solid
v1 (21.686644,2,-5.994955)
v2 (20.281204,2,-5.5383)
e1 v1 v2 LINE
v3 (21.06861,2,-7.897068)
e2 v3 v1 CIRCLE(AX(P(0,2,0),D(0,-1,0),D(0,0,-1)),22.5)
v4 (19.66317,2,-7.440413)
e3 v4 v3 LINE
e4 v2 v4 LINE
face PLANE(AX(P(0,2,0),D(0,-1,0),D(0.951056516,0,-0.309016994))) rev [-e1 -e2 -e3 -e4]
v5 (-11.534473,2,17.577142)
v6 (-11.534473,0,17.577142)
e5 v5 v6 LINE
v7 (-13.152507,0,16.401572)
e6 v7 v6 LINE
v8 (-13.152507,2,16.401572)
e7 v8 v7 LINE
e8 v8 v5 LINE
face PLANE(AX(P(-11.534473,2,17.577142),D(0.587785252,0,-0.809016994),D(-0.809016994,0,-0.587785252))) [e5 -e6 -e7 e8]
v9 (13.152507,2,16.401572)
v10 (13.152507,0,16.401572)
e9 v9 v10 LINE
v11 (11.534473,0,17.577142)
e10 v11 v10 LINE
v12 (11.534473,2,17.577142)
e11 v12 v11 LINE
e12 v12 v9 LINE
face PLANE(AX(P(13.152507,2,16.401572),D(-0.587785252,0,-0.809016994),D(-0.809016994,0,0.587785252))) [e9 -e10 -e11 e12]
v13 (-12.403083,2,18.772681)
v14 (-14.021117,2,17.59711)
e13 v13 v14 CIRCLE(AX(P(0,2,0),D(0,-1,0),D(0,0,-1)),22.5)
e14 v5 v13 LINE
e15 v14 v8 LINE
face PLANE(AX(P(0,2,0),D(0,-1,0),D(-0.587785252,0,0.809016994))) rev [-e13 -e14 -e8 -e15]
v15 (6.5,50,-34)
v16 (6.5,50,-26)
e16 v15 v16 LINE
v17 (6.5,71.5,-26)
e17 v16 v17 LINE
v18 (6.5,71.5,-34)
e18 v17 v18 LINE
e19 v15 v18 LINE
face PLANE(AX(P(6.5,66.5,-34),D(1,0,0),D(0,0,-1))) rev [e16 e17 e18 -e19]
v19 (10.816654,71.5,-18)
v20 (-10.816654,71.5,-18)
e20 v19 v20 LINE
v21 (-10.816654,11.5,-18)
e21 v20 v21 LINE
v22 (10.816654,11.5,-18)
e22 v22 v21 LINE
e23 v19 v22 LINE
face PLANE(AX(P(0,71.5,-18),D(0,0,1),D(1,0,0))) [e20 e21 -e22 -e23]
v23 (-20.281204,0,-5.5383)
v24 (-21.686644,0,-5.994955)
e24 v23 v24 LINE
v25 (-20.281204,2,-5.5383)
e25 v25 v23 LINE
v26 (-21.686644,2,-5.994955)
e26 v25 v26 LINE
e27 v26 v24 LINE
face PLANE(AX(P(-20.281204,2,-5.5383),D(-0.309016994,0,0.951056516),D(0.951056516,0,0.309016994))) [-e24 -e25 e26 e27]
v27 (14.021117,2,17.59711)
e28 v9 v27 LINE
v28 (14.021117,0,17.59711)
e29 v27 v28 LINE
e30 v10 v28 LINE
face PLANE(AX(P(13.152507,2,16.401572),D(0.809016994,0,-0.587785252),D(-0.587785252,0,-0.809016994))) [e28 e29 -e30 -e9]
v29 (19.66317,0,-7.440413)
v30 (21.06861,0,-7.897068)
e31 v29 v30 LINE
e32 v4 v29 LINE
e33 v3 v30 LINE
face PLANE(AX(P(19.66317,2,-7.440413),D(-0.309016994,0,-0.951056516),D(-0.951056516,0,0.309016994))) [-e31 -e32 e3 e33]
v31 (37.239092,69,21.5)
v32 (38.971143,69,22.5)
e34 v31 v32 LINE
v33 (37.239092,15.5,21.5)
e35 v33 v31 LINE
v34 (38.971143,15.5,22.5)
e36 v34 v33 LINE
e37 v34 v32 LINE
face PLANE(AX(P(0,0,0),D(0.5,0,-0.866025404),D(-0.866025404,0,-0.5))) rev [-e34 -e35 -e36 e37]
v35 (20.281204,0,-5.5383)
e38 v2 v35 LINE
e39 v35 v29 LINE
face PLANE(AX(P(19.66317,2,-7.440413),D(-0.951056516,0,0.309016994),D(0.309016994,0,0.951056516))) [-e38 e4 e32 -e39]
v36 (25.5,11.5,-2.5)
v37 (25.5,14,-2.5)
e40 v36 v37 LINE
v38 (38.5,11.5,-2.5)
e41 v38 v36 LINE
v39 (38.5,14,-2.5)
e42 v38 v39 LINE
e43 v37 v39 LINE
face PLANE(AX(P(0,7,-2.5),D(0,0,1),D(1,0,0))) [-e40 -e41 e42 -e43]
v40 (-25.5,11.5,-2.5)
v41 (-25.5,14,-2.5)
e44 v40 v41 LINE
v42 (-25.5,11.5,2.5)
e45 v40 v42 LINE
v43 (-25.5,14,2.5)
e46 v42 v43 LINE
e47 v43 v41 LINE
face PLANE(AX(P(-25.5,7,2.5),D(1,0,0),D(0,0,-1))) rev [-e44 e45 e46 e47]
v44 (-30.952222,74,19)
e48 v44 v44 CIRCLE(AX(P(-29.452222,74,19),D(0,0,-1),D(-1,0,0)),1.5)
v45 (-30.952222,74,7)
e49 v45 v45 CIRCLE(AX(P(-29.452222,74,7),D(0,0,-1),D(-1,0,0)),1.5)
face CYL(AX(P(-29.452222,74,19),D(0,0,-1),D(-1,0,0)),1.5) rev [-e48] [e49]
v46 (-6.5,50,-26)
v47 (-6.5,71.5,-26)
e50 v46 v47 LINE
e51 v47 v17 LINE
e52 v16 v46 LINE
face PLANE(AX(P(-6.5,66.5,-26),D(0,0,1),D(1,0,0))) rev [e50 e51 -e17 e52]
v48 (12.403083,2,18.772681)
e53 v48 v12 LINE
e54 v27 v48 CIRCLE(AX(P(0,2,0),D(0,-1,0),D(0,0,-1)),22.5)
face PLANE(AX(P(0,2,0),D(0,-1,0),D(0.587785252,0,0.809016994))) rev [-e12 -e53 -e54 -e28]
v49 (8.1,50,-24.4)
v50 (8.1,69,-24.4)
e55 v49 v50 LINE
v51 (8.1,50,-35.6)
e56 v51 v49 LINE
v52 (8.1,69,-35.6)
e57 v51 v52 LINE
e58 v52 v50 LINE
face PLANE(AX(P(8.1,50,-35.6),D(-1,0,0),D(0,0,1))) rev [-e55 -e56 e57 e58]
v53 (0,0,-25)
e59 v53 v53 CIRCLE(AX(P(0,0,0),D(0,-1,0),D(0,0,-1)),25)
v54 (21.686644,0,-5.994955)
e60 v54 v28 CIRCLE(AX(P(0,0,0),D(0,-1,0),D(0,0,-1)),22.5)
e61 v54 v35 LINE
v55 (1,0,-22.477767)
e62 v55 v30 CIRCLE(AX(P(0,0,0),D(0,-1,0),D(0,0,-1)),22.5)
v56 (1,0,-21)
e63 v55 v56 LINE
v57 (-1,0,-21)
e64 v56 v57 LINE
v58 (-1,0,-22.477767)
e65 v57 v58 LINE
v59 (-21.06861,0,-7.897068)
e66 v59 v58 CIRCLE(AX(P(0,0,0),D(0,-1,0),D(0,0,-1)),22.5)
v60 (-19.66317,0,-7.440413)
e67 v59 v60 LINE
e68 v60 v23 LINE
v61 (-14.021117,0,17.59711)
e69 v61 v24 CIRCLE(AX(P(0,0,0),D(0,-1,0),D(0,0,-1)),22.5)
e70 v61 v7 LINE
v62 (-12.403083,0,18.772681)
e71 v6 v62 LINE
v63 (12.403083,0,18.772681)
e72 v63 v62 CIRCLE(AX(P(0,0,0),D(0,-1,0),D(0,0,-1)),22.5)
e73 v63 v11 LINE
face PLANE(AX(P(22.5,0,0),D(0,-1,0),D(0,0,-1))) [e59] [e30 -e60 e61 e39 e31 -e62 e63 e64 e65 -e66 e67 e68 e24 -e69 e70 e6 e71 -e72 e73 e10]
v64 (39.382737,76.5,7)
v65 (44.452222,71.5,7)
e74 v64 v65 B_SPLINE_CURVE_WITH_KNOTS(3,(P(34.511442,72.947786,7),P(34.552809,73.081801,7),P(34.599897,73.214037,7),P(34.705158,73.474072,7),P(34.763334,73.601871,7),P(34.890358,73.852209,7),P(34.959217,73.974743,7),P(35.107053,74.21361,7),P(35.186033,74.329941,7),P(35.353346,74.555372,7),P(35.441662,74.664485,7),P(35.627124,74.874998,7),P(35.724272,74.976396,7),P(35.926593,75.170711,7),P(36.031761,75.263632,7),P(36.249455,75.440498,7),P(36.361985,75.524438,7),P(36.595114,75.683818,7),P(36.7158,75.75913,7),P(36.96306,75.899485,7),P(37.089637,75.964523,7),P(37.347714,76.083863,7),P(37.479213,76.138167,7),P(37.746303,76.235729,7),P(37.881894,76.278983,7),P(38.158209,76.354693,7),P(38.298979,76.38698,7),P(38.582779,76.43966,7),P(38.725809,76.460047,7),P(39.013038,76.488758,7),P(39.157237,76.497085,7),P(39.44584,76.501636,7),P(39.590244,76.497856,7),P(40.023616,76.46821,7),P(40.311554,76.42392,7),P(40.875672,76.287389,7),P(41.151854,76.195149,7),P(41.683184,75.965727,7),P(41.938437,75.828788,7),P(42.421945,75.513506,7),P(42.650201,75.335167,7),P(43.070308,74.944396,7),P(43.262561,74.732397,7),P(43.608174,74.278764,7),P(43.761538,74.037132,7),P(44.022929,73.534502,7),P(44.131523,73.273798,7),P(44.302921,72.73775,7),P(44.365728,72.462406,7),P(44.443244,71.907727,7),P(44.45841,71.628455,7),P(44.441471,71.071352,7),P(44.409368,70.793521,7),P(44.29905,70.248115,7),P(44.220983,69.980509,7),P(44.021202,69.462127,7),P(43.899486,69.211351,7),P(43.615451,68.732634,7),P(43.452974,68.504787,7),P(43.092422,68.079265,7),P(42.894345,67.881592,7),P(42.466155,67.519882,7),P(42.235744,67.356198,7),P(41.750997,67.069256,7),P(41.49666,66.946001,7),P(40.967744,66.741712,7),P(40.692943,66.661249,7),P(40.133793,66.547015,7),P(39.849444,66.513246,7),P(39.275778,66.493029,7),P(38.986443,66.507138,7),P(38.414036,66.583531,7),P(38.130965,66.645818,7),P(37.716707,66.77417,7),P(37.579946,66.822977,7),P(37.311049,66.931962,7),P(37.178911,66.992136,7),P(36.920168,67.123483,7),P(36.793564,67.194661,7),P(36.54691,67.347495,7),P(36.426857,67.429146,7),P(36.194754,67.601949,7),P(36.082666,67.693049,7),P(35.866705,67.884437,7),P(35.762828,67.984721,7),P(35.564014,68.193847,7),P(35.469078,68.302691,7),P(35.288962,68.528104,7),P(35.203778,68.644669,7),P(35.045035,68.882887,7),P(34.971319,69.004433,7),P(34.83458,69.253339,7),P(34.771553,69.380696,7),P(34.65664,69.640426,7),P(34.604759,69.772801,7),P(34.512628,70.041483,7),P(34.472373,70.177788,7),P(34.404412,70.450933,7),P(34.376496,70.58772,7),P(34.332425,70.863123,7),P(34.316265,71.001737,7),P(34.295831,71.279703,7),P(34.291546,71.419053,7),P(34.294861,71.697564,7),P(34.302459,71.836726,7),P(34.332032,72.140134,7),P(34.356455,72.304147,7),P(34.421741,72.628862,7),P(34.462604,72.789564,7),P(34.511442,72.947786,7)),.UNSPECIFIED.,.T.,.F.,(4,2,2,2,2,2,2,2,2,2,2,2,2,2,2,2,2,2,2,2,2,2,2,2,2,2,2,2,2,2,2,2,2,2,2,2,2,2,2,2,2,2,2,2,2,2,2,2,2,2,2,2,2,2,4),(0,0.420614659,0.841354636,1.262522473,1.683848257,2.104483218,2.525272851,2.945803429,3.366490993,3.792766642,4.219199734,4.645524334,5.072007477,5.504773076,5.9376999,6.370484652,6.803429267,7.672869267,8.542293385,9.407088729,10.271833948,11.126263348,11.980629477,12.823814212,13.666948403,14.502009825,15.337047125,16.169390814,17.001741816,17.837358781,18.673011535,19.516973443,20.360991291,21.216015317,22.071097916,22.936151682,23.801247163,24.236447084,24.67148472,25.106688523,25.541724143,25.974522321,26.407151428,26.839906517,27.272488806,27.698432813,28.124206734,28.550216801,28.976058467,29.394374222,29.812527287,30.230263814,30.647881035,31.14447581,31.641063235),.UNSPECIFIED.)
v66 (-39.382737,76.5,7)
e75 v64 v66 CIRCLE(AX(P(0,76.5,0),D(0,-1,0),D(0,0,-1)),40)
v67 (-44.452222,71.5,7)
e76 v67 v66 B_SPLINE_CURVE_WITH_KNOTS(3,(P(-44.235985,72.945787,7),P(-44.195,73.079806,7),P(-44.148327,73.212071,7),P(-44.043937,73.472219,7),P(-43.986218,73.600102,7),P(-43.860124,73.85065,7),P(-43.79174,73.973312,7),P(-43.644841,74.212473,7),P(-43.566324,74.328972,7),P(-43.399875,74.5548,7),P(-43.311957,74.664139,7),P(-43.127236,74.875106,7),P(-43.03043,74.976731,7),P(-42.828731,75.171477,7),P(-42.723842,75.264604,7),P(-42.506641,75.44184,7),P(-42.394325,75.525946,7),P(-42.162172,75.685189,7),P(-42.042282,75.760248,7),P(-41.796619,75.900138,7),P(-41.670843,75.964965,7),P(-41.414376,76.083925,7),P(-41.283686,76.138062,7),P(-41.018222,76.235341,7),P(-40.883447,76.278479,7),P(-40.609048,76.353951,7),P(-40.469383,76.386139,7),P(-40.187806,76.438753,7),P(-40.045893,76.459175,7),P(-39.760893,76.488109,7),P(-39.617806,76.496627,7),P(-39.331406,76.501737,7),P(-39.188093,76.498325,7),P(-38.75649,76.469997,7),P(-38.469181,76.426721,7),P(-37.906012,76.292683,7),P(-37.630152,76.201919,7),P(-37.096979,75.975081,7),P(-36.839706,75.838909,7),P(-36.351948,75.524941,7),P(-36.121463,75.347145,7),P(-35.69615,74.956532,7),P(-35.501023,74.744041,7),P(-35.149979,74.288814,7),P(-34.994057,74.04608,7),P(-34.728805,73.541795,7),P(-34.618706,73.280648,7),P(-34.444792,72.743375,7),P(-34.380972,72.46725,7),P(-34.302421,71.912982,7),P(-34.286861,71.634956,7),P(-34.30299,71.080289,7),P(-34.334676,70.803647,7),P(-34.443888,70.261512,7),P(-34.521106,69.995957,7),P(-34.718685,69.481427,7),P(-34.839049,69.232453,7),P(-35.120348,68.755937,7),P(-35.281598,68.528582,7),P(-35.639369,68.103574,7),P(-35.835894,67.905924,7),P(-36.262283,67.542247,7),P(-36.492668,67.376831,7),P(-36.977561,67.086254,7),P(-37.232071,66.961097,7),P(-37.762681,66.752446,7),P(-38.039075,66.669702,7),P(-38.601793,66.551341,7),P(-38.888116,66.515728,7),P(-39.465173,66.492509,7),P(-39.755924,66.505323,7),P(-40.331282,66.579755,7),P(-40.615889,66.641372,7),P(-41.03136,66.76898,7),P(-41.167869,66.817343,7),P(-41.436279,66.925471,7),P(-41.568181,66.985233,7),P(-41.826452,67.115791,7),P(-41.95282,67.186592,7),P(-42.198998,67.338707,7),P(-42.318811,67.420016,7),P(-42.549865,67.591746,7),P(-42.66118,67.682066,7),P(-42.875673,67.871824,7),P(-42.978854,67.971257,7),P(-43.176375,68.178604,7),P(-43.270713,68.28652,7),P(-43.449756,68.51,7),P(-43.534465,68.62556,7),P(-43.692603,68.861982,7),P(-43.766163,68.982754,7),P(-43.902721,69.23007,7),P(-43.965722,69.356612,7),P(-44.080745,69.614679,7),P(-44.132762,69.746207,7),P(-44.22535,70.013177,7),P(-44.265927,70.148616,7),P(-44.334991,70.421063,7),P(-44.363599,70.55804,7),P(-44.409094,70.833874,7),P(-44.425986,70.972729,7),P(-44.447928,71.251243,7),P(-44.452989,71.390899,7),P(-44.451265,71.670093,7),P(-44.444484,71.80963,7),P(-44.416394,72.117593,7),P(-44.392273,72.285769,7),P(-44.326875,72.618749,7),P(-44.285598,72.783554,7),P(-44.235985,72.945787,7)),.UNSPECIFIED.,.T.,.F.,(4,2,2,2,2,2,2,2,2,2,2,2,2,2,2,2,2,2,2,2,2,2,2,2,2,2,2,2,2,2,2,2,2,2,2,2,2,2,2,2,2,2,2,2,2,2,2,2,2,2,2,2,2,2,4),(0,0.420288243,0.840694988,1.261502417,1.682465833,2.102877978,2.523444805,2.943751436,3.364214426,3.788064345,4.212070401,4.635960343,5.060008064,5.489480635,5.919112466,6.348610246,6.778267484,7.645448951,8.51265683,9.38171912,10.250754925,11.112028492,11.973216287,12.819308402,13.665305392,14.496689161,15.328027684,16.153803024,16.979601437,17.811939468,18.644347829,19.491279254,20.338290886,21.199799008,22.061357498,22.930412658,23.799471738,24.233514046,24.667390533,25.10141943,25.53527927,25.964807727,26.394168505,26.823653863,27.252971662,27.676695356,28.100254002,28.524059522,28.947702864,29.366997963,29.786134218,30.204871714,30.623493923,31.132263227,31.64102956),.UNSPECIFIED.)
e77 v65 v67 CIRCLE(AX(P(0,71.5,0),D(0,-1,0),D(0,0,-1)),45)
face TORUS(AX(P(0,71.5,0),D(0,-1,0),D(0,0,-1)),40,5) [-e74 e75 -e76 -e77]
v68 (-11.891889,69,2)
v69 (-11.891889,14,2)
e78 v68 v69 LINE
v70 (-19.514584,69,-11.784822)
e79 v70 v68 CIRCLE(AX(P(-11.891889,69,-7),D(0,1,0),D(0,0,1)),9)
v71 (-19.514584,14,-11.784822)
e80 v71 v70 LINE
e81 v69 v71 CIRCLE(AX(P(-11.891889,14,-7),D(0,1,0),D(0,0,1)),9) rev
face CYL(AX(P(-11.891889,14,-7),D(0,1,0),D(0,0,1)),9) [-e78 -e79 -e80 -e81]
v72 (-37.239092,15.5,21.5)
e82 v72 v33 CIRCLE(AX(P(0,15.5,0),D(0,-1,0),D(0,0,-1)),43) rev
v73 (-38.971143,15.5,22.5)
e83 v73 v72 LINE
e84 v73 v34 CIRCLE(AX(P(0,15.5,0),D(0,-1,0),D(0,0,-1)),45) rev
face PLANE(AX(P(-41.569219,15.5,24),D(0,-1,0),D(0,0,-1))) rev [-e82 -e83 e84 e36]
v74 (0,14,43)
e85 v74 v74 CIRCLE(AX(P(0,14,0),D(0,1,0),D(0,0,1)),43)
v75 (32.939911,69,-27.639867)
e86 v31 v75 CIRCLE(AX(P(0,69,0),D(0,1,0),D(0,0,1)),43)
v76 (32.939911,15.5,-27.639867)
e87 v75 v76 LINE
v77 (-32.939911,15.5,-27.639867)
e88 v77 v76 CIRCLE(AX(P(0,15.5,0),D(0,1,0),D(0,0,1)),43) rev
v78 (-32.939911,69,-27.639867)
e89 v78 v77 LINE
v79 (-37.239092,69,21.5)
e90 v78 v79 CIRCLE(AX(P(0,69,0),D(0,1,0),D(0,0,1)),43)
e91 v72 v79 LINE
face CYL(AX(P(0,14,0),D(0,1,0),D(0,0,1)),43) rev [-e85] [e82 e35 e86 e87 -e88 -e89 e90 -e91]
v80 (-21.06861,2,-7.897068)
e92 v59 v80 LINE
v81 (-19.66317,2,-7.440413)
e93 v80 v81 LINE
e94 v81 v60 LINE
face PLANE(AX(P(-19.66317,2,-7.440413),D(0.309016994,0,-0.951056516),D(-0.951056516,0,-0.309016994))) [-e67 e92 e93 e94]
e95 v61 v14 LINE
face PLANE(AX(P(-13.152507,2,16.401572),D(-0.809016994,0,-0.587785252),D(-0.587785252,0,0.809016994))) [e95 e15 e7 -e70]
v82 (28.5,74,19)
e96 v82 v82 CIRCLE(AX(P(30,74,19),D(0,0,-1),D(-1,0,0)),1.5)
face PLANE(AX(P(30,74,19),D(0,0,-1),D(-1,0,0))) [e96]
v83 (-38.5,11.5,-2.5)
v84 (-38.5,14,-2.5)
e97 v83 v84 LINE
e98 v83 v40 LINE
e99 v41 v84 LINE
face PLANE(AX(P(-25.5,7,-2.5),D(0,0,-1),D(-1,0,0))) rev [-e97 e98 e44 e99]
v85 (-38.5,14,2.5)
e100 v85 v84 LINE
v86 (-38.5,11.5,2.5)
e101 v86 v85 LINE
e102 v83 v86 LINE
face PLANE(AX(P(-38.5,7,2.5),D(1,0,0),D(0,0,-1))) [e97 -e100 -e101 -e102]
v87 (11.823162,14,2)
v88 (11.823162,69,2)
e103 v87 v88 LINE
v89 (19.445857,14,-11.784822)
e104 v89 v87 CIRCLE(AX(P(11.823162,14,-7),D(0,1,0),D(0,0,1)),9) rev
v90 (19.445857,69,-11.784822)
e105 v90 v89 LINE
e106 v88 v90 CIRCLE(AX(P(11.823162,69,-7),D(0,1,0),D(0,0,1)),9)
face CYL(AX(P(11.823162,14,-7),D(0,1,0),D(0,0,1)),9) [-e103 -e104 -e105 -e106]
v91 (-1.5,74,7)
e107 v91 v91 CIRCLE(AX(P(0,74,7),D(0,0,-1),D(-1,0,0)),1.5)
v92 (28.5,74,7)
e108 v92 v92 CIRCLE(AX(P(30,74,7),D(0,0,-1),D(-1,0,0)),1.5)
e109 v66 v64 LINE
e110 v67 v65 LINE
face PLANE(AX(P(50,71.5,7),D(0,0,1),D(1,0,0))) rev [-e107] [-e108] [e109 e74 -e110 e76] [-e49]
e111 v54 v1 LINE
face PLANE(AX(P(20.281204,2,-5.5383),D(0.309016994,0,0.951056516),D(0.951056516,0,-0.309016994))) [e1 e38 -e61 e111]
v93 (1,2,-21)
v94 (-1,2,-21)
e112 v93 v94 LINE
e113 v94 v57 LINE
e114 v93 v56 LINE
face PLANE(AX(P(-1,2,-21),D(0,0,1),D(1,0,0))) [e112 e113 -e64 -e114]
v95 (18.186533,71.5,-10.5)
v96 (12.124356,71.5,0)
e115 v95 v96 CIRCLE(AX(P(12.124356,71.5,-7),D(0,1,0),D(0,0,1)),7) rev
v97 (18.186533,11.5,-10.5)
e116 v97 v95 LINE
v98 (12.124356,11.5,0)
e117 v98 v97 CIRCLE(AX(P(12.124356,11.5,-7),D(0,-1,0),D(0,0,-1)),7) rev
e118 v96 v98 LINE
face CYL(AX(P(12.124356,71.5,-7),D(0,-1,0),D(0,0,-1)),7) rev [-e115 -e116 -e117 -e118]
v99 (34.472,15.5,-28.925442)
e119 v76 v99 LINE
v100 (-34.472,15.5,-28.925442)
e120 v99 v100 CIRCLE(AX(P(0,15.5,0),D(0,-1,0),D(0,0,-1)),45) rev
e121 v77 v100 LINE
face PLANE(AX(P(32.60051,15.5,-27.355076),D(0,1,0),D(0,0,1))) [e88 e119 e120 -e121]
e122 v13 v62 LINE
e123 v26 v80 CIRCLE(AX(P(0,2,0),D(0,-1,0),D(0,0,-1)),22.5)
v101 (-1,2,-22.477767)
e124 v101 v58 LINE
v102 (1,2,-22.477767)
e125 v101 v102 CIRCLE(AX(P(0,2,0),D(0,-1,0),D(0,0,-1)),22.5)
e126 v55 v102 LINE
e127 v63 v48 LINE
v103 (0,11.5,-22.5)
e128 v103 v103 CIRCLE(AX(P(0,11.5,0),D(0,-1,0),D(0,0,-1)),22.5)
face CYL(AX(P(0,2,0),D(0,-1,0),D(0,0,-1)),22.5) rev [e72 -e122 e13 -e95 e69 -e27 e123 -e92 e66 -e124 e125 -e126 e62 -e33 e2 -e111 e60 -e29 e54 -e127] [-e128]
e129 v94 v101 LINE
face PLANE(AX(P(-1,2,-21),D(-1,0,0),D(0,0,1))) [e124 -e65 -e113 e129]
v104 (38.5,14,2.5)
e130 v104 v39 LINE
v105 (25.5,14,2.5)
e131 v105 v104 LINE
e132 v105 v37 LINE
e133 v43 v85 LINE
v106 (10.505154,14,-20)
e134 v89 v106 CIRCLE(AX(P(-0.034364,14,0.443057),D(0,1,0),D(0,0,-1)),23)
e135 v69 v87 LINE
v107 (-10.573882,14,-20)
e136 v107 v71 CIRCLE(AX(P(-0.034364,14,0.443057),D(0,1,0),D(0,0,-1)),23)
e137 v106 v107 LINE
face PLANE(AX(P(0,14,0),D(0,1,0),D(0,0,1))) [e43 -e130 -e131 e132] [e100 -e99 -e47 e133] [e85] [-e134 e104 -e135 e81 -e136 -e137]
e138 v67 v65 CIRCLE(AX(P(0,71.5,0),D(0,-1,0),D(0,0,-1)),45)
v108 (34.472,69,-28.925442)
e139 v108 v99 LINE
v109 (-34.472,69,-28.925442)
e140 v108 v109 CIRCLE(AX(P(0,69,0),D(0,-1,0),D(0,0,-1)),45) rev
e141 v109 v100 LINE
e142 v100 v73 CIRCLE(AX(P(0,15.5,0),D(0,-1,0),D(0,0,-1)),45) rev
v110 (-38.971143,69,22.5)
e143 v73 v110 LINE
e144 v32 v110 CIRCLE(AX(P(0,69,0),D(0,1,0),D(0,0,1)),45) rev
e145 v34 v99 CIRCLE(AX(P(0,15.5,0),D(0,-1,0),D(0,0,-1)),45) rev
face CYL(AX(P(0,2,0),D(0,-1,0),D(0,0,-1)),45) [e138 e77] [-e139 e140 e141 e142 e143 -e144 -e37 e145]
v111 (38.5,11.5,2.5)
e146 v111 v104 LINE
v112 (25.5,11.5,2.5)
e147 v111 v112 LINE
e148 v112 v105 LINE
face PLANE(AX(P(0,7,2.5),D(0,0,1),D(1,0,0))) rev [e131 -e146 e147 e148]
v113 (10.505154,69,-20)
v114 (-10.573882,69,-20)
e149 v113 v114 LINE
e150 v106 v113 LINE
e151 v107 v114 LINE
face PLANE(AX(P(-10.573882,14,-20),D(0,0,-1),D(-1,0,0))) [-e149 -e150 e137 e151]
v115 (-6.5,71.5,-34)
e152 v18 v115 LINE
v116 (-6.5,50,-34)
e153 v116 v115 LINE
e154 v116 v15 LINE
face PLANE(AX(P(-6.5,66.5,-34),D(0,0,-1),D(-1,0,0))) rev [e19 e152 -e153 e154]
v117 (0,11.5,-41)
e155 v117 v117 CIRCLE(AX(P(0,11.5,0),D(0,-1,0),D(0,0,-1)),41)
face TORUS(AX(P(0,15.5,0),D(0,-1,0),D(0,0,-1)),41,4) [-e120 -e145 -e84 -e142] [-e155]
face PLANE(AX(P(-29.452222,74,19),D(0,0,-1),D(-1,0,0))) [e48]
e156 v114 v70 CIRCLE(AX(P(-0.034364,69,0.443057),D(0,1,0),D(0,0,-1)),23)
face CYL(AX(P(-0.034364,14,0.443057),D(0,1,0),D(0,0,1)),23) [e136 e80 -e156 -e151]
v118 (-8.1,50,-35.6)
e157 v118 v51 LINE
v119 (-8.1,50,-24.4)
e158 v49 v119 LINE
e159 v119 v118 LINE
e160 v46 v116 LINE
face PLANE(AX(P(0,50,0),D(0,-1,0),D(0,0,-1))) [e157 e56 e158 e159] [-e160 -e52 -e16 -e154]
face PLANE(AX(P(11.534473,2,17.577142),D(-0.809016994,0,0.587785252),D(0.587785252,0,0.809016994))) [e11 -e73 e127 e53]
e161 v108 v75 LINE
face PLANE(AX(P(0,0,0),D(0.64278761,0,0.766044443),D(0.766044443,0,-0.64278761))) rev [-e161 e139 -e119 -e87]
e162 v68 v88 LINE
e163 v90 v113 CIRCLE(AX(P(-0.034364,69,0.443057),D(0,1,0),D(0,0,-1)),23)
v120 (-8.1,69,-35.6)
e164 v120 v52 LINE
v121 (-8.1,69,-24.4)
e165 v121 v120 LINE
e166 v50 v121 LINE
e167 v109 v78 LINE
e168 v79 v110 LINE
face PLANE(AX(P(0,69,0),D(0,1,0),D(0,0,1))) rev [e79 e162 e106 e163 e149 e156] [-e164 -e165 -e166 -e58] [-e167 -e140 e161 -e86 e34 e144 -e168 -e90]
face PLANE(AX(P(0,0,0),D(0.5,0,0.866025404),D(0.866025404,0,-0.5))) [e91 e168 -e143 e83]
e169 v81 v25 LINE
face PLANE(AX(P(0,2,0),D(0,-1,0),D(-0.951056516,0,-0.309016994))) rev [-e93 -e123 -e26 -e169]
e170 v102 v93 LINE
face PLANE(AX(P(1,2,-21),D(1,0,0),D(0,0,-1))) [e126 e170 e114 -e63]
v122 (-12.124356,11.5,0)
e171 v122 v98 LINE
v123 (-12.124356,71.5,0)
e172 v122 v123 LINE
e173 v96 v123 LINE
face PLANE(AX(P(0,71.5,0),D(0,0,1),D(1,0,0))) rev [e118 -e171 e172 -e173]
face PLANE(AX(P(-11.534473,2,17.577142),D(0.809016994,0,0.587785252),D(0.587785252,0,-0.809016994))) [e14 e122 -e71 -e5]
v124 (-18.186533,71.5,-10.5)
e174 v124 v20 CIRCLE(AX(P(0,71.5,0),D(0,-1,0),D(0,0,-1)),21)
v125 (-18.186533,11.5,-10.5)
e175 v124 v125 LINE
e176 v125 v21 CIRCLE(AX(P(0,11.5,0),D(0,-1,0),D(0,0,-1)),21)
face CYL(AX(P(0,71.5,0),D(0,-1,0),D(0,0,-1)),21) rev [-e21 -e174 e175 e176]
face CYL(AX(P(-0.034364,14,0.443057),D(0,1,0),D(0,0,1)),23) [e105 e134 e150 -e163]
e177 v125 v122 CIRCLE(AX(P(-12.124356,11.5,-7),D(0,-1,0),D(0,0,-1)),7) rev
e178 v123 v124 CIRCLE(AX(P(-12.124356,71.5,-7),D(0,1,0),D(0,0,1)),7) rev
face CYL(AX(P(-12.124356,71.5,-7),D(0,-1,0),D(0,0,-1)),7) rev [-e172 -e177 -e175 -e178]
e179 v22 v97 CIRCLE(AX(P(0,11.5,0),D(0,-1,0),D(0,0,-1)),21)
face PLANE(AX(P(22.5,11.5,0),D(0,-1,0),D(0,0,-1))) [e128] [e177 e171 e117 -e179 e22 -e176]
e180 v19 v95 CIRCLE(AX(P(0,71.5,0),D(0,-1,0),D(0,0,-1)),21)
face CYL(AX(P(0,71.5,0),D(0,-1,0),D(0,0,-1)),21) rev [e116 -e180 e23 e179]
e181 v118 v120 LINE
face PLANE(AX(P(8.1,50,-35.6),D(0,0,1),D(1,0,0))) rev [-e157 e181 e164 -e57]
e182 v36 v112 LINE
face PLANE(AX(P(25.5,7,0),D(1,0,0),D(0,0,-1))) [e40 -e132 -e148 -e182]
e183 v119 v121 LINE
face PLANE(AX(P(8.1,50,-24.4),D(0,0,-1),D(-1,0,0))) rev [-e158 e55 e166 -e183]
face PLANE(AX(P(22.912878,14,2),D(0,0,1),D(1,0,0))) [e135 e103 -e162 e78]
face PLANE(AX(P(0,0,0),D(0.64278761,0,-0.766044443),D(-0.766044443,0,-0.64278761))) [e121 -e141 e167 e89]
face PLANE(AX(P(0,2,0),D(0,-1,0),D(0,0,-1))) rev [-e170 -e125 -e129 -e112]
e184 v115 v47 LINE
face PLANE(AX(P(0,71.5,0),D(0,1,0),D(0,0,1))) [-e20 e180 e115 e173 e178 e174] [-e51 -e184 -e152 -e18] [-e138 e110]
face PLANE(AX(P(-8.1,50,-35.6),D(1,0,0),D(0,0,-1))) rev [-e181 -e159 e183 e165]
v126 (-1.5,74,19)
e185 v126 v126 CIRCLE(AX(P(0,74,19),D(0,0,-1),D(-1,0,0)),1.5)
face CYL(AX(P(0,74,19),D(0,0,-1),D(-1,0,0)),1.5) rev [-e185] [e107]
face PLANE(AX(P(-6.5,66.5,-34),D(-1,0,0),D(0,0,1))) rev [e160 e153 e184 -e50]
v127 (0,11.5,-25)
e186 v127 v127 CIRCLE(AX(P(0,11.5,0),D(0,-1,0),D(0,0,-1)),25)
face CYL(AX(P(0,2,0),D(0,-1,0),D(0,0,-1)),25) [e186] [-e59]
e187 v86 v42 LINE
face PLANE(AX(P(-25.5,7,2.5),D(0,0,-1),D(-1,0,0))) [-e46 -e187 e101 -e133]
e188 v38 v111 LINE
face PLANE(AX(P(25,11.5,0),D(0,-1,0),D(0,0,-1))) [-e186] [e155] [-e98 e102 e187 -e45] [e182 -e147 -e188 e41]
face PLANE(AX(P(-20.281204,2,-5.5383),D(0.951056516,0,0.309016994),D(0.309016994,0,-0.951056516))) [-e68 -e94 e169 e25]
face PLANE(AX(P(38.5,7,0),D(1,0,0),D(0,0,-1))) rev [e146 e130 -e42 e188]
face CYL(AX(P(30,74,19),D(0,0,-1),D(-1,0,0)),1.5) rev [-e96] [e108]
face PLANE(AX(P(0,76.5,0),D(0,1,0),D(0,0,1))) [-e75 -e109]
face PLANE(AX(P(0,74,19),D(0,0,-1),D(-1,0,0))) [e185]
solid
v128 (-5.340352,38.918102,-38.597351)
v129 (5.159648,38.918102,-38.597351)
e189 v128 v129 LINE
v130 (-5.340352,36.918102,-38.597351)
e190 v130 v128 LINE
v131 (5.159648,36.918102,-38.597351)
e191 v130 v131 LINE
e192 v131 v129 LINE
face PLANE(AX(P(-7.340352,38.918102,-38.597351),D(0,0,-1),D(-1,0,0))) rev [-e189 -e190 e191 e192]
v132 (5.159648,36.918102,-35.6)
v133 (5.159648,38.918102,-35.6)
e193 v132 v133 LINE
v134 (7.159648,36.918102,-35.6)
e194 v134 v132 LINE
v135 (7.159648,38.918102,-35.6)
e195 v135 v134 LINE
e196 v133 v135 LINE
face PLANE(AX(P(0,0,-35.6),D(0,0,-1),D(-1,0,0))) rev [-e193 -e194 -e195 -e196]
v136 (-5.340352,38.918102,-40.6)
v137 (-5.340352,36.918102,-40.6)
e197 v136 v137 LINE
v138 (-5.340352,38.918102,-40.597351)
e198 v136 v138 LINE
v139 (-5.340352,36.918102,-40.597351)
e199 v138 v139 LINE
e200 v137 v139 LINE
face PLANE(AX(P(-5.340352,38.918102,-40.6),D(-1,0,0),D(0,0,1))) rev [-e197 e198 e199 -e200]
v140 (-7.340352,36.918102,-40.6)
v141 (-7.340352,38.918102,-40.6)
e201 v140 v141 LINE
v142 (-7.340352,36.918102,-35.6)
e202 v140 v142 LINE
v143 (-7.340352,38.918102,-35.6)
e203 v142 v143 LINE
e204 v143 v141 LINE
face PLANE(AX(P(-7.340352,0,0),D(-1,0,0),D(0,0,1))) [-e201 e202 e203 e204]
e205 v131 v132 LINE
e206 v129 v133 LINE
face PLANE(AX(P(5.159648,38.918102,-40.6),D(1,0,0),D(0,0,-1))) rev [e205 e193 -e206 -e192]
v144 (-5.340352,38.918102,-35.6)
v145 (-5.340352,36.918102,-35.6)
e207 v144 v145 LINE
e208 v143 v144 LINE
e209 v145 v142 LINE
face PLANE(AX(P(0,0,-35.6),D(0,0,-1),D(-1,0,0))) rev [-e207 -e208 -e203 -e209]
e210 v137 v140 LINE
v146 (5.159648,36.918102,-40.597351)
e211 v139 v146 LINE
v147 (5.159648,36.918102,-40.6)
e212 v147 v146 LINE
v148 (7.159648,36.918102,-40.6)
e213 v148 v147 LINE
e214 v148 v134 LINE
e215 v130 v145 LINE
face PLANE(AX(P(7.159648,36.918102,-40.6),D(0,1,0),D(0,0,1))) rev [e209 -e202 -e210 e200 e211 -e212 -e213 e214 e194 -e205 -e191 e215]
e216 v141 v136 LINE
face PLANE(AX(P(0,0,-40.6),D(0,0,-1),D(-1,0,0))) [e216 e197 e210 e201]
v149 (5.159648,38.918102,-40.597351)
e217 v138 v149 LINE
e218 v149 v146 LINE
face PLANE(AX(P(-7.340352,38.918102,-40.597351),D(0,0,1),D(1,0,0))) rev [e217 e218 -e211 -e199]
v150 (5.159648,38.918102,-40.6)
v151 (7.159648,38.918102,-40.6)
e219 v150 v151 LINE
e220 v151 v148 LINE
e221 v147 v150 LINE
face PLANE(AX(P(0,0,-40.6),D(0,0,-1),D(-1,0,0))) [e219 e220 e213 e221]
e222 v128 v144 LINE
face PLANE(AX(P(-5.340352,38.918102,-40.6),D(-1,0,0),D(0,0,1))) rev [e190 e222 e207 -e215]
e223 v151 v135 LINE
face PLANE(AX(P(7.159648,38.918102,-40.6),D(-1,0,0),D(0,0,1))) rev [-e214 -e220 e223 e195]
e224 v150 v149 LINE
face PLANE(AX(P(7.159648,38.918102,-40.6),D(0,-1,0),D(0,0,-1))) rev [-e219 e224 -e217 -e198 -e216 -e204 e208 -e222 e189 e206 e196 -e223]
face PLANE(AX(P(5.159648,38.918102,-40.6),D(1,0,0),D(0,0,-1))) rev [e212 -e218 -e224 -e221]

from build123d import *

# Parameters (mm, degrees)
CUT_EXTRUDE1_DEPTH           = 5
CUT_EXTRUDE3_DEPTH           = 60
SKETCH8_R                    = 43
CUT_EXTRUDE4_DEPTH           = 55
FILLET1_R                    = 7
SKETCH12_W                   = 6.5
SKETCH12_H                   = 53.5
CUT_REVOLVE1_ANGLE           = 60
CUT_REVOLVE1_OTHER_WAY_ANGLE = 60
SKETCH18_W                   = 13
SKETCH18_H                   = 8
CUT_EXTRUDE13_DEPTH          = 5
SKETCH20_W                   = 100
SKETCH20_H                   = 7
CUT_EXTRUDE15_DEPTH          = 5
SKETCH19_R                   = 1.5
CUT_EXTRUDE14_DEPTH          = 12
FILLET3_R                    = 4
SKETCH24_W                   = 2
SKETCH24_H                   = 3
BOSS_EXTRUDE3_DEPTH          = 2
CIRPATTERN2_COUNT            = 5
SKETCH26_W                   = 5
SKETCH26_H                   = 53.5
CUT_REVOLVE2_ANGLE           = 50
CUT_REVOLVE2_OTHER_WAY_ANGLE = 50
SKETCH29_W                   = 16.2
SKETCH29_H                   = 11.2
SKETCH29_W_2                 = 13
SKETCH29_H_2                 = 8
BOSS_EXTRUDE4_DEPTH          = 19
SKETCH36_W                   = 2
SKETCH36_H                   = 2
BOSS_EXTRUDE7_DEPTH          = 5
SKETCH37_W                   = 2
SKETCH37_H                   = 2
BOSS_EXTRUDE8_DEPTH          = 12.5
SKETCH40_W                   = 2
SKETCH40_H                   = 2
BOSS_EXTRUDE9_DEPTH          = 5
FILLET8_R                    = 9
SKETCH50_W                   = 13
SKETCH50_H                   = 5
CUT_EXTRUDE23_DEPTH          = 7


with BuildPart() as part:
    # Sketch1 → Revolve1 (revolve)
    with BuildSketch(Plane.XY, mode=Mode.PRIVATE) as revolve1_sk:
        with BuildLine():
            Line((0, 76.5), (0, 11.5))
            Line((0, 11.5), (22.5, 11.5))
            Line((22.5, 11.5), (22.5, 0))
            Line((22.5, 0), (25, 0))
            Line((25, 0), (25, 11.5))
            Line((25, 11.5), (45, 11.5))
            Line((45, 11.5), (45, 71.5))
            ThreePointArc((45, 71.5), (43.535533906, 75.035533906), (40, 76.5))
            Line((40, 76.5), (0, 76.5))
        make_face()
    revolve(revolve1_sk.sketch.rotate(Axis((0, 2, 0), (0, 1, 0)), 90), axis=Axis((0, 2, 0), (0, 1, 0)))

    # Sketch5 → Cut-Extrude1 (cut)
    with BuildSketch(Plane(origin=(0, 76.5, 0), x_dir=(1, 0, 0), z_dir=(0, 1, 0))):
        with BuildLine():
            Line((-45, 0), (45, 0))
            ThreePointArc((45, 0), (0, 45), (-45, 0))
        make_face()
    extrude(amount=-CUT_EXTRUDE1_DEPTH, mode=Mode.SUBTRACT)

    # Sketch7 → Cut-Extrude3 (cut)
    with BuildSketch(Plane.XZ.offset(-11.5)):
        with BuildLine():
            Line((21, 0), (-21, 0))
            ThreePointArc((-21, 0), (-18.277714988, -10.340461055), (-10.816653826, -18))
            Line((-10.816653826, -18), (10.816653826, -18))
            ThreePointArc((10.816653826, -18), (18.277714988, -10.340461055), (21, 0))
        make_face()
    extrude(amount=-CUT_EXTRUDE3_DEPTH, mode=Mode.SUBTRACT)

    # Sketch8 → Cut-Extrude4 (cut)
    with BuildSketch(Plane(origin=(0, 69, 0), x_dir=(1, 0, 0), z_dir=(0, 1, 0))):
        with Locations(Location((0, 0, 0), (0, 0, 270))):
            Circle(SKETCH8_R)
        with BuildLine():
            Line((22.912878475, -2), (-22.981606036, -2))
            ThreePointArc((-22.981606036, -2), (-20.067855169, 10.855581536), (-10.573881727, 20))
            Line((-10.573881727, 20), (10.505154166, 20))
            ThreePointArc((10.505154166, 20), (19.999127608, 10.855581536), (22.912878475, -2))
        make_face(mode=Mode.SUBTRACT)
    extrude(amount=-CUT_EXTRUDE4_DEPTH, mode=Mode.SUBTRACT)

    # Fillet1
    fillet1_edges = [part.edges().sort_by_distance(p)[0] for p in [
        (-21, 41.5, 0),
        (21, 41.5, 0),
    ]]
    fillet(fillet1_edges, radius=FILLET1_R)

    # Sketch12 → Cut-Revolve1 (revolve, cut)
    with BuildSketch(Plane(origin=(0, 0, 0), x_dir=(0, 0, -1), z_dir=(1, 0, 0))):
        with Locations((-44.75, 42.25)):
            Rectangle(SKETCH12_W, SKETCH12_H)
    revolve(axis=Axis((0, 71.5, 0), (0, -1, 0)), revolution_arc=CUT_REVOLVE1_ANGLE, mode=Mode.SUBTRACT)

    # Sketch12 → Cut-Revolve1 other way (revolve, cut)
    with BuildSketch(Plane(origin=(0, 0, 0), x_dir=(0, 0, -1), z_dir=(1, 0, 0))):
        with Locations((-44.75, 42.25)):
            Rectangle(SKETCH12_W, SKETCH12_H)
    revolve(axis=Axis((0, 71.5, 0), (0, 1, 0)), revolution_arc=CUT_REVOLVE1_OTHER_WAY_ANGLE, mode=Mode.SUBTRACT)

    # Sketch18 → Cut-Extrude13 (cut)
    with BuildSketch(Plane(origin=(0, 71.5, 0), x_dir=(1, 0, 0), z_dir=(0, 1, 0))):
        with Locations((0, 30)):
            Rectangle(SKETCH18_W, SKETCH18_H)
    extrude(amount=-CUT_EXTRUDE13_DEPTH, mode=Mode.SUBTRACT)

    # Sketch20 → Cut-Extrude15 (cut)
    with BuildSketch(Plane(origin=(0, 76.5, 0), x_dir=(1, 0, 0), z_dir=(0, 1, 0))):
        with Locations((0, -3.5)):
            Rectangle(SKETCH20_W, SKETCH20_H)
    extrude(amount=-CUT_EXTRUDE15_DEPTH, mode=Mode.SUBTRACT)

    # Sketch19 → Cut-Extrude14 (cut)
    with BuildSketch(Plane(origin=(0, 0, 7), x_dir=(-1, 0, 0), z_dir=(0, 0, -1))):
        with Locations((0, 74)):
            Circle(SKETCH19_R)
        with Locations((-30, 74)):
            Circle(SKETCH19_R)
        with Locations((29.452221542, 74)):
            Circle(SKETCH19_R)
    extrude(amount=-CUT_EXTRUDE14_DEPTH, mode=Mode.SUBTRACT)

    # Fillet3
    fillet3_edges = [part.edges().sort_by_distance(p)[0] for p in [
        (0, 11.5, 45),
    ]]
    fillet(fillet3_edges, radius=FILLET3_R - 0.0001)  # a hair under: the kernel refuses the full size

    # Sketch24 → Boss-Extrude3 (add)
    with BuildSketch(Plane.XZ):
        with Locations((0, -22.5)):
            Rectangle(SKETCH24_W, SKETCH24_H)
    boss_extrude3 = extrude(amount=-BOSS_EXTRUDE3_DEPTH)

    # CirPattern2: Boss-Extrude3 ×5 about axis
    cirpattern2_axis = Axis((0, 0, 0), (0, 1, 0))
    for i in range(1, CIRPATTERN2_COUNT):
        add(boss_extrude3.rotate(cirpattern2_axis, i * 360 / CIRPATTERN2_COUNT))

    # Sketch26 → Cut-Revolve2 (revolve, cut)
    with BuildSketch(Plane(origin=(0, 0, 0), x_dir=(0, 0, -1), z_dir=(1, 0, 0))):
        with Locations((45.056943441, 42.25)):
            Rectangle(SKETCH26_W, SKETCH26_H)
    revolve(axis=Axis((0, 2, 0), (0, -1, 0)), revolution_arc=CUT_REVOLVE2_ANGLE, mode=Mode.SUBTRACT)

    # Sketch26 → Cut-Revolve2 other way (revolve, cut)
    with BuildSketch(Plane(origin=(0, 0, 0), x_dir=(0, 0, -1), z_dir=(1, 0, 0))):
        with Locations((45.056943441, 42.25)):
            Rectangle(SKETCH26_W, SKETCH26_H)
    revolve(axis=Axis((0, 2, 0), (0, 1, 0)), revolution_arc=CUT_REVOLVE2_OTHER_WAY_ANGLE, mode=Mode.SUBTRACT)

    # Sketch29 → Boss-Extrude4 (add)
    with BuildSketch(Plane.XZ.offset(-69)):
        with Locations((0, -30)):
            Rectangle(SKETCH29_W, SKETCH29_H)
        with Locations((0, -30)):
            Rectangle(SKETCH29_W_2, SKETCH29_H_2, mode=Mode.SUBTRACT)
    extrude(amount=BOSS_EXTRUDE4_DEPTH)

    # Fillet8
    fillet8_edges = [part.edges().sort_by_distance(p)[0] for p in [
        (-22.981606036, 41.5, 2),
        (22.912878475, 41.5, 2),
    ]]
    fillet(fillet8_edges, radius=FILLET8_R)

    # Sketch50 → Cut-Extrude23 (cut)
    with BuildSketch(Plane(origin=(0, 14, 0), x_dir=(1, 0, 0), z_dir=(0, 1, 0))):
        with Locations((32, 0)):
            Rectangle(SKETCH50_W, SKETCH50_H)
        with Locations((-32, 0)):
            Rectangle(SKETCH50_W, SKETCH50_H)
    extrude(amount=-CUT_EXTRUDE23_DEPTH, mode=Mode.SUBTRACT)


with BuildPart() as body_2:
    # Sketch36 → Boss-Extrude7 (new body)
    with BuildSketch(Plane(origin=(0, 0, -35.6), x_dir=(-1, 0, 0), z_dir=(0, 0, -1))):
        with Locations((-6.159647943, 37.918102195)):
            Rectangle(SKETCH36_W, SKETCH36_H)
    extrude(amount=BOSS_EXTRUDE7_DEPTH)

    # Sketch37 → Boss-Extrude8 (add)
    with BuildSketch(Plane.ZY.offset(-5.159647943)):
        with Locations((-39.597351245, 37.918102195)):
            Rectangle(SKETCH37_W, SKETCH37_H)
    extrude(amount=BOSS_EXTRUDE8_DEPTH)

    # Sketch40 → Boss-Extrude9 (add)
    with BuildSketch(Plane(origin=(0, 0, -35.6), x_dir=(-1, 0, 0), z_dir=(0, 0, -1))):
        with Locations((6.340352057, 37.918102195)):
            Rectangle(SKETCH40_W, SKETCH40_H)
    extrude(amount=BOSS_EXTRUDE9_DEPTH)


solid = Compound([part.part, body_2.part])
